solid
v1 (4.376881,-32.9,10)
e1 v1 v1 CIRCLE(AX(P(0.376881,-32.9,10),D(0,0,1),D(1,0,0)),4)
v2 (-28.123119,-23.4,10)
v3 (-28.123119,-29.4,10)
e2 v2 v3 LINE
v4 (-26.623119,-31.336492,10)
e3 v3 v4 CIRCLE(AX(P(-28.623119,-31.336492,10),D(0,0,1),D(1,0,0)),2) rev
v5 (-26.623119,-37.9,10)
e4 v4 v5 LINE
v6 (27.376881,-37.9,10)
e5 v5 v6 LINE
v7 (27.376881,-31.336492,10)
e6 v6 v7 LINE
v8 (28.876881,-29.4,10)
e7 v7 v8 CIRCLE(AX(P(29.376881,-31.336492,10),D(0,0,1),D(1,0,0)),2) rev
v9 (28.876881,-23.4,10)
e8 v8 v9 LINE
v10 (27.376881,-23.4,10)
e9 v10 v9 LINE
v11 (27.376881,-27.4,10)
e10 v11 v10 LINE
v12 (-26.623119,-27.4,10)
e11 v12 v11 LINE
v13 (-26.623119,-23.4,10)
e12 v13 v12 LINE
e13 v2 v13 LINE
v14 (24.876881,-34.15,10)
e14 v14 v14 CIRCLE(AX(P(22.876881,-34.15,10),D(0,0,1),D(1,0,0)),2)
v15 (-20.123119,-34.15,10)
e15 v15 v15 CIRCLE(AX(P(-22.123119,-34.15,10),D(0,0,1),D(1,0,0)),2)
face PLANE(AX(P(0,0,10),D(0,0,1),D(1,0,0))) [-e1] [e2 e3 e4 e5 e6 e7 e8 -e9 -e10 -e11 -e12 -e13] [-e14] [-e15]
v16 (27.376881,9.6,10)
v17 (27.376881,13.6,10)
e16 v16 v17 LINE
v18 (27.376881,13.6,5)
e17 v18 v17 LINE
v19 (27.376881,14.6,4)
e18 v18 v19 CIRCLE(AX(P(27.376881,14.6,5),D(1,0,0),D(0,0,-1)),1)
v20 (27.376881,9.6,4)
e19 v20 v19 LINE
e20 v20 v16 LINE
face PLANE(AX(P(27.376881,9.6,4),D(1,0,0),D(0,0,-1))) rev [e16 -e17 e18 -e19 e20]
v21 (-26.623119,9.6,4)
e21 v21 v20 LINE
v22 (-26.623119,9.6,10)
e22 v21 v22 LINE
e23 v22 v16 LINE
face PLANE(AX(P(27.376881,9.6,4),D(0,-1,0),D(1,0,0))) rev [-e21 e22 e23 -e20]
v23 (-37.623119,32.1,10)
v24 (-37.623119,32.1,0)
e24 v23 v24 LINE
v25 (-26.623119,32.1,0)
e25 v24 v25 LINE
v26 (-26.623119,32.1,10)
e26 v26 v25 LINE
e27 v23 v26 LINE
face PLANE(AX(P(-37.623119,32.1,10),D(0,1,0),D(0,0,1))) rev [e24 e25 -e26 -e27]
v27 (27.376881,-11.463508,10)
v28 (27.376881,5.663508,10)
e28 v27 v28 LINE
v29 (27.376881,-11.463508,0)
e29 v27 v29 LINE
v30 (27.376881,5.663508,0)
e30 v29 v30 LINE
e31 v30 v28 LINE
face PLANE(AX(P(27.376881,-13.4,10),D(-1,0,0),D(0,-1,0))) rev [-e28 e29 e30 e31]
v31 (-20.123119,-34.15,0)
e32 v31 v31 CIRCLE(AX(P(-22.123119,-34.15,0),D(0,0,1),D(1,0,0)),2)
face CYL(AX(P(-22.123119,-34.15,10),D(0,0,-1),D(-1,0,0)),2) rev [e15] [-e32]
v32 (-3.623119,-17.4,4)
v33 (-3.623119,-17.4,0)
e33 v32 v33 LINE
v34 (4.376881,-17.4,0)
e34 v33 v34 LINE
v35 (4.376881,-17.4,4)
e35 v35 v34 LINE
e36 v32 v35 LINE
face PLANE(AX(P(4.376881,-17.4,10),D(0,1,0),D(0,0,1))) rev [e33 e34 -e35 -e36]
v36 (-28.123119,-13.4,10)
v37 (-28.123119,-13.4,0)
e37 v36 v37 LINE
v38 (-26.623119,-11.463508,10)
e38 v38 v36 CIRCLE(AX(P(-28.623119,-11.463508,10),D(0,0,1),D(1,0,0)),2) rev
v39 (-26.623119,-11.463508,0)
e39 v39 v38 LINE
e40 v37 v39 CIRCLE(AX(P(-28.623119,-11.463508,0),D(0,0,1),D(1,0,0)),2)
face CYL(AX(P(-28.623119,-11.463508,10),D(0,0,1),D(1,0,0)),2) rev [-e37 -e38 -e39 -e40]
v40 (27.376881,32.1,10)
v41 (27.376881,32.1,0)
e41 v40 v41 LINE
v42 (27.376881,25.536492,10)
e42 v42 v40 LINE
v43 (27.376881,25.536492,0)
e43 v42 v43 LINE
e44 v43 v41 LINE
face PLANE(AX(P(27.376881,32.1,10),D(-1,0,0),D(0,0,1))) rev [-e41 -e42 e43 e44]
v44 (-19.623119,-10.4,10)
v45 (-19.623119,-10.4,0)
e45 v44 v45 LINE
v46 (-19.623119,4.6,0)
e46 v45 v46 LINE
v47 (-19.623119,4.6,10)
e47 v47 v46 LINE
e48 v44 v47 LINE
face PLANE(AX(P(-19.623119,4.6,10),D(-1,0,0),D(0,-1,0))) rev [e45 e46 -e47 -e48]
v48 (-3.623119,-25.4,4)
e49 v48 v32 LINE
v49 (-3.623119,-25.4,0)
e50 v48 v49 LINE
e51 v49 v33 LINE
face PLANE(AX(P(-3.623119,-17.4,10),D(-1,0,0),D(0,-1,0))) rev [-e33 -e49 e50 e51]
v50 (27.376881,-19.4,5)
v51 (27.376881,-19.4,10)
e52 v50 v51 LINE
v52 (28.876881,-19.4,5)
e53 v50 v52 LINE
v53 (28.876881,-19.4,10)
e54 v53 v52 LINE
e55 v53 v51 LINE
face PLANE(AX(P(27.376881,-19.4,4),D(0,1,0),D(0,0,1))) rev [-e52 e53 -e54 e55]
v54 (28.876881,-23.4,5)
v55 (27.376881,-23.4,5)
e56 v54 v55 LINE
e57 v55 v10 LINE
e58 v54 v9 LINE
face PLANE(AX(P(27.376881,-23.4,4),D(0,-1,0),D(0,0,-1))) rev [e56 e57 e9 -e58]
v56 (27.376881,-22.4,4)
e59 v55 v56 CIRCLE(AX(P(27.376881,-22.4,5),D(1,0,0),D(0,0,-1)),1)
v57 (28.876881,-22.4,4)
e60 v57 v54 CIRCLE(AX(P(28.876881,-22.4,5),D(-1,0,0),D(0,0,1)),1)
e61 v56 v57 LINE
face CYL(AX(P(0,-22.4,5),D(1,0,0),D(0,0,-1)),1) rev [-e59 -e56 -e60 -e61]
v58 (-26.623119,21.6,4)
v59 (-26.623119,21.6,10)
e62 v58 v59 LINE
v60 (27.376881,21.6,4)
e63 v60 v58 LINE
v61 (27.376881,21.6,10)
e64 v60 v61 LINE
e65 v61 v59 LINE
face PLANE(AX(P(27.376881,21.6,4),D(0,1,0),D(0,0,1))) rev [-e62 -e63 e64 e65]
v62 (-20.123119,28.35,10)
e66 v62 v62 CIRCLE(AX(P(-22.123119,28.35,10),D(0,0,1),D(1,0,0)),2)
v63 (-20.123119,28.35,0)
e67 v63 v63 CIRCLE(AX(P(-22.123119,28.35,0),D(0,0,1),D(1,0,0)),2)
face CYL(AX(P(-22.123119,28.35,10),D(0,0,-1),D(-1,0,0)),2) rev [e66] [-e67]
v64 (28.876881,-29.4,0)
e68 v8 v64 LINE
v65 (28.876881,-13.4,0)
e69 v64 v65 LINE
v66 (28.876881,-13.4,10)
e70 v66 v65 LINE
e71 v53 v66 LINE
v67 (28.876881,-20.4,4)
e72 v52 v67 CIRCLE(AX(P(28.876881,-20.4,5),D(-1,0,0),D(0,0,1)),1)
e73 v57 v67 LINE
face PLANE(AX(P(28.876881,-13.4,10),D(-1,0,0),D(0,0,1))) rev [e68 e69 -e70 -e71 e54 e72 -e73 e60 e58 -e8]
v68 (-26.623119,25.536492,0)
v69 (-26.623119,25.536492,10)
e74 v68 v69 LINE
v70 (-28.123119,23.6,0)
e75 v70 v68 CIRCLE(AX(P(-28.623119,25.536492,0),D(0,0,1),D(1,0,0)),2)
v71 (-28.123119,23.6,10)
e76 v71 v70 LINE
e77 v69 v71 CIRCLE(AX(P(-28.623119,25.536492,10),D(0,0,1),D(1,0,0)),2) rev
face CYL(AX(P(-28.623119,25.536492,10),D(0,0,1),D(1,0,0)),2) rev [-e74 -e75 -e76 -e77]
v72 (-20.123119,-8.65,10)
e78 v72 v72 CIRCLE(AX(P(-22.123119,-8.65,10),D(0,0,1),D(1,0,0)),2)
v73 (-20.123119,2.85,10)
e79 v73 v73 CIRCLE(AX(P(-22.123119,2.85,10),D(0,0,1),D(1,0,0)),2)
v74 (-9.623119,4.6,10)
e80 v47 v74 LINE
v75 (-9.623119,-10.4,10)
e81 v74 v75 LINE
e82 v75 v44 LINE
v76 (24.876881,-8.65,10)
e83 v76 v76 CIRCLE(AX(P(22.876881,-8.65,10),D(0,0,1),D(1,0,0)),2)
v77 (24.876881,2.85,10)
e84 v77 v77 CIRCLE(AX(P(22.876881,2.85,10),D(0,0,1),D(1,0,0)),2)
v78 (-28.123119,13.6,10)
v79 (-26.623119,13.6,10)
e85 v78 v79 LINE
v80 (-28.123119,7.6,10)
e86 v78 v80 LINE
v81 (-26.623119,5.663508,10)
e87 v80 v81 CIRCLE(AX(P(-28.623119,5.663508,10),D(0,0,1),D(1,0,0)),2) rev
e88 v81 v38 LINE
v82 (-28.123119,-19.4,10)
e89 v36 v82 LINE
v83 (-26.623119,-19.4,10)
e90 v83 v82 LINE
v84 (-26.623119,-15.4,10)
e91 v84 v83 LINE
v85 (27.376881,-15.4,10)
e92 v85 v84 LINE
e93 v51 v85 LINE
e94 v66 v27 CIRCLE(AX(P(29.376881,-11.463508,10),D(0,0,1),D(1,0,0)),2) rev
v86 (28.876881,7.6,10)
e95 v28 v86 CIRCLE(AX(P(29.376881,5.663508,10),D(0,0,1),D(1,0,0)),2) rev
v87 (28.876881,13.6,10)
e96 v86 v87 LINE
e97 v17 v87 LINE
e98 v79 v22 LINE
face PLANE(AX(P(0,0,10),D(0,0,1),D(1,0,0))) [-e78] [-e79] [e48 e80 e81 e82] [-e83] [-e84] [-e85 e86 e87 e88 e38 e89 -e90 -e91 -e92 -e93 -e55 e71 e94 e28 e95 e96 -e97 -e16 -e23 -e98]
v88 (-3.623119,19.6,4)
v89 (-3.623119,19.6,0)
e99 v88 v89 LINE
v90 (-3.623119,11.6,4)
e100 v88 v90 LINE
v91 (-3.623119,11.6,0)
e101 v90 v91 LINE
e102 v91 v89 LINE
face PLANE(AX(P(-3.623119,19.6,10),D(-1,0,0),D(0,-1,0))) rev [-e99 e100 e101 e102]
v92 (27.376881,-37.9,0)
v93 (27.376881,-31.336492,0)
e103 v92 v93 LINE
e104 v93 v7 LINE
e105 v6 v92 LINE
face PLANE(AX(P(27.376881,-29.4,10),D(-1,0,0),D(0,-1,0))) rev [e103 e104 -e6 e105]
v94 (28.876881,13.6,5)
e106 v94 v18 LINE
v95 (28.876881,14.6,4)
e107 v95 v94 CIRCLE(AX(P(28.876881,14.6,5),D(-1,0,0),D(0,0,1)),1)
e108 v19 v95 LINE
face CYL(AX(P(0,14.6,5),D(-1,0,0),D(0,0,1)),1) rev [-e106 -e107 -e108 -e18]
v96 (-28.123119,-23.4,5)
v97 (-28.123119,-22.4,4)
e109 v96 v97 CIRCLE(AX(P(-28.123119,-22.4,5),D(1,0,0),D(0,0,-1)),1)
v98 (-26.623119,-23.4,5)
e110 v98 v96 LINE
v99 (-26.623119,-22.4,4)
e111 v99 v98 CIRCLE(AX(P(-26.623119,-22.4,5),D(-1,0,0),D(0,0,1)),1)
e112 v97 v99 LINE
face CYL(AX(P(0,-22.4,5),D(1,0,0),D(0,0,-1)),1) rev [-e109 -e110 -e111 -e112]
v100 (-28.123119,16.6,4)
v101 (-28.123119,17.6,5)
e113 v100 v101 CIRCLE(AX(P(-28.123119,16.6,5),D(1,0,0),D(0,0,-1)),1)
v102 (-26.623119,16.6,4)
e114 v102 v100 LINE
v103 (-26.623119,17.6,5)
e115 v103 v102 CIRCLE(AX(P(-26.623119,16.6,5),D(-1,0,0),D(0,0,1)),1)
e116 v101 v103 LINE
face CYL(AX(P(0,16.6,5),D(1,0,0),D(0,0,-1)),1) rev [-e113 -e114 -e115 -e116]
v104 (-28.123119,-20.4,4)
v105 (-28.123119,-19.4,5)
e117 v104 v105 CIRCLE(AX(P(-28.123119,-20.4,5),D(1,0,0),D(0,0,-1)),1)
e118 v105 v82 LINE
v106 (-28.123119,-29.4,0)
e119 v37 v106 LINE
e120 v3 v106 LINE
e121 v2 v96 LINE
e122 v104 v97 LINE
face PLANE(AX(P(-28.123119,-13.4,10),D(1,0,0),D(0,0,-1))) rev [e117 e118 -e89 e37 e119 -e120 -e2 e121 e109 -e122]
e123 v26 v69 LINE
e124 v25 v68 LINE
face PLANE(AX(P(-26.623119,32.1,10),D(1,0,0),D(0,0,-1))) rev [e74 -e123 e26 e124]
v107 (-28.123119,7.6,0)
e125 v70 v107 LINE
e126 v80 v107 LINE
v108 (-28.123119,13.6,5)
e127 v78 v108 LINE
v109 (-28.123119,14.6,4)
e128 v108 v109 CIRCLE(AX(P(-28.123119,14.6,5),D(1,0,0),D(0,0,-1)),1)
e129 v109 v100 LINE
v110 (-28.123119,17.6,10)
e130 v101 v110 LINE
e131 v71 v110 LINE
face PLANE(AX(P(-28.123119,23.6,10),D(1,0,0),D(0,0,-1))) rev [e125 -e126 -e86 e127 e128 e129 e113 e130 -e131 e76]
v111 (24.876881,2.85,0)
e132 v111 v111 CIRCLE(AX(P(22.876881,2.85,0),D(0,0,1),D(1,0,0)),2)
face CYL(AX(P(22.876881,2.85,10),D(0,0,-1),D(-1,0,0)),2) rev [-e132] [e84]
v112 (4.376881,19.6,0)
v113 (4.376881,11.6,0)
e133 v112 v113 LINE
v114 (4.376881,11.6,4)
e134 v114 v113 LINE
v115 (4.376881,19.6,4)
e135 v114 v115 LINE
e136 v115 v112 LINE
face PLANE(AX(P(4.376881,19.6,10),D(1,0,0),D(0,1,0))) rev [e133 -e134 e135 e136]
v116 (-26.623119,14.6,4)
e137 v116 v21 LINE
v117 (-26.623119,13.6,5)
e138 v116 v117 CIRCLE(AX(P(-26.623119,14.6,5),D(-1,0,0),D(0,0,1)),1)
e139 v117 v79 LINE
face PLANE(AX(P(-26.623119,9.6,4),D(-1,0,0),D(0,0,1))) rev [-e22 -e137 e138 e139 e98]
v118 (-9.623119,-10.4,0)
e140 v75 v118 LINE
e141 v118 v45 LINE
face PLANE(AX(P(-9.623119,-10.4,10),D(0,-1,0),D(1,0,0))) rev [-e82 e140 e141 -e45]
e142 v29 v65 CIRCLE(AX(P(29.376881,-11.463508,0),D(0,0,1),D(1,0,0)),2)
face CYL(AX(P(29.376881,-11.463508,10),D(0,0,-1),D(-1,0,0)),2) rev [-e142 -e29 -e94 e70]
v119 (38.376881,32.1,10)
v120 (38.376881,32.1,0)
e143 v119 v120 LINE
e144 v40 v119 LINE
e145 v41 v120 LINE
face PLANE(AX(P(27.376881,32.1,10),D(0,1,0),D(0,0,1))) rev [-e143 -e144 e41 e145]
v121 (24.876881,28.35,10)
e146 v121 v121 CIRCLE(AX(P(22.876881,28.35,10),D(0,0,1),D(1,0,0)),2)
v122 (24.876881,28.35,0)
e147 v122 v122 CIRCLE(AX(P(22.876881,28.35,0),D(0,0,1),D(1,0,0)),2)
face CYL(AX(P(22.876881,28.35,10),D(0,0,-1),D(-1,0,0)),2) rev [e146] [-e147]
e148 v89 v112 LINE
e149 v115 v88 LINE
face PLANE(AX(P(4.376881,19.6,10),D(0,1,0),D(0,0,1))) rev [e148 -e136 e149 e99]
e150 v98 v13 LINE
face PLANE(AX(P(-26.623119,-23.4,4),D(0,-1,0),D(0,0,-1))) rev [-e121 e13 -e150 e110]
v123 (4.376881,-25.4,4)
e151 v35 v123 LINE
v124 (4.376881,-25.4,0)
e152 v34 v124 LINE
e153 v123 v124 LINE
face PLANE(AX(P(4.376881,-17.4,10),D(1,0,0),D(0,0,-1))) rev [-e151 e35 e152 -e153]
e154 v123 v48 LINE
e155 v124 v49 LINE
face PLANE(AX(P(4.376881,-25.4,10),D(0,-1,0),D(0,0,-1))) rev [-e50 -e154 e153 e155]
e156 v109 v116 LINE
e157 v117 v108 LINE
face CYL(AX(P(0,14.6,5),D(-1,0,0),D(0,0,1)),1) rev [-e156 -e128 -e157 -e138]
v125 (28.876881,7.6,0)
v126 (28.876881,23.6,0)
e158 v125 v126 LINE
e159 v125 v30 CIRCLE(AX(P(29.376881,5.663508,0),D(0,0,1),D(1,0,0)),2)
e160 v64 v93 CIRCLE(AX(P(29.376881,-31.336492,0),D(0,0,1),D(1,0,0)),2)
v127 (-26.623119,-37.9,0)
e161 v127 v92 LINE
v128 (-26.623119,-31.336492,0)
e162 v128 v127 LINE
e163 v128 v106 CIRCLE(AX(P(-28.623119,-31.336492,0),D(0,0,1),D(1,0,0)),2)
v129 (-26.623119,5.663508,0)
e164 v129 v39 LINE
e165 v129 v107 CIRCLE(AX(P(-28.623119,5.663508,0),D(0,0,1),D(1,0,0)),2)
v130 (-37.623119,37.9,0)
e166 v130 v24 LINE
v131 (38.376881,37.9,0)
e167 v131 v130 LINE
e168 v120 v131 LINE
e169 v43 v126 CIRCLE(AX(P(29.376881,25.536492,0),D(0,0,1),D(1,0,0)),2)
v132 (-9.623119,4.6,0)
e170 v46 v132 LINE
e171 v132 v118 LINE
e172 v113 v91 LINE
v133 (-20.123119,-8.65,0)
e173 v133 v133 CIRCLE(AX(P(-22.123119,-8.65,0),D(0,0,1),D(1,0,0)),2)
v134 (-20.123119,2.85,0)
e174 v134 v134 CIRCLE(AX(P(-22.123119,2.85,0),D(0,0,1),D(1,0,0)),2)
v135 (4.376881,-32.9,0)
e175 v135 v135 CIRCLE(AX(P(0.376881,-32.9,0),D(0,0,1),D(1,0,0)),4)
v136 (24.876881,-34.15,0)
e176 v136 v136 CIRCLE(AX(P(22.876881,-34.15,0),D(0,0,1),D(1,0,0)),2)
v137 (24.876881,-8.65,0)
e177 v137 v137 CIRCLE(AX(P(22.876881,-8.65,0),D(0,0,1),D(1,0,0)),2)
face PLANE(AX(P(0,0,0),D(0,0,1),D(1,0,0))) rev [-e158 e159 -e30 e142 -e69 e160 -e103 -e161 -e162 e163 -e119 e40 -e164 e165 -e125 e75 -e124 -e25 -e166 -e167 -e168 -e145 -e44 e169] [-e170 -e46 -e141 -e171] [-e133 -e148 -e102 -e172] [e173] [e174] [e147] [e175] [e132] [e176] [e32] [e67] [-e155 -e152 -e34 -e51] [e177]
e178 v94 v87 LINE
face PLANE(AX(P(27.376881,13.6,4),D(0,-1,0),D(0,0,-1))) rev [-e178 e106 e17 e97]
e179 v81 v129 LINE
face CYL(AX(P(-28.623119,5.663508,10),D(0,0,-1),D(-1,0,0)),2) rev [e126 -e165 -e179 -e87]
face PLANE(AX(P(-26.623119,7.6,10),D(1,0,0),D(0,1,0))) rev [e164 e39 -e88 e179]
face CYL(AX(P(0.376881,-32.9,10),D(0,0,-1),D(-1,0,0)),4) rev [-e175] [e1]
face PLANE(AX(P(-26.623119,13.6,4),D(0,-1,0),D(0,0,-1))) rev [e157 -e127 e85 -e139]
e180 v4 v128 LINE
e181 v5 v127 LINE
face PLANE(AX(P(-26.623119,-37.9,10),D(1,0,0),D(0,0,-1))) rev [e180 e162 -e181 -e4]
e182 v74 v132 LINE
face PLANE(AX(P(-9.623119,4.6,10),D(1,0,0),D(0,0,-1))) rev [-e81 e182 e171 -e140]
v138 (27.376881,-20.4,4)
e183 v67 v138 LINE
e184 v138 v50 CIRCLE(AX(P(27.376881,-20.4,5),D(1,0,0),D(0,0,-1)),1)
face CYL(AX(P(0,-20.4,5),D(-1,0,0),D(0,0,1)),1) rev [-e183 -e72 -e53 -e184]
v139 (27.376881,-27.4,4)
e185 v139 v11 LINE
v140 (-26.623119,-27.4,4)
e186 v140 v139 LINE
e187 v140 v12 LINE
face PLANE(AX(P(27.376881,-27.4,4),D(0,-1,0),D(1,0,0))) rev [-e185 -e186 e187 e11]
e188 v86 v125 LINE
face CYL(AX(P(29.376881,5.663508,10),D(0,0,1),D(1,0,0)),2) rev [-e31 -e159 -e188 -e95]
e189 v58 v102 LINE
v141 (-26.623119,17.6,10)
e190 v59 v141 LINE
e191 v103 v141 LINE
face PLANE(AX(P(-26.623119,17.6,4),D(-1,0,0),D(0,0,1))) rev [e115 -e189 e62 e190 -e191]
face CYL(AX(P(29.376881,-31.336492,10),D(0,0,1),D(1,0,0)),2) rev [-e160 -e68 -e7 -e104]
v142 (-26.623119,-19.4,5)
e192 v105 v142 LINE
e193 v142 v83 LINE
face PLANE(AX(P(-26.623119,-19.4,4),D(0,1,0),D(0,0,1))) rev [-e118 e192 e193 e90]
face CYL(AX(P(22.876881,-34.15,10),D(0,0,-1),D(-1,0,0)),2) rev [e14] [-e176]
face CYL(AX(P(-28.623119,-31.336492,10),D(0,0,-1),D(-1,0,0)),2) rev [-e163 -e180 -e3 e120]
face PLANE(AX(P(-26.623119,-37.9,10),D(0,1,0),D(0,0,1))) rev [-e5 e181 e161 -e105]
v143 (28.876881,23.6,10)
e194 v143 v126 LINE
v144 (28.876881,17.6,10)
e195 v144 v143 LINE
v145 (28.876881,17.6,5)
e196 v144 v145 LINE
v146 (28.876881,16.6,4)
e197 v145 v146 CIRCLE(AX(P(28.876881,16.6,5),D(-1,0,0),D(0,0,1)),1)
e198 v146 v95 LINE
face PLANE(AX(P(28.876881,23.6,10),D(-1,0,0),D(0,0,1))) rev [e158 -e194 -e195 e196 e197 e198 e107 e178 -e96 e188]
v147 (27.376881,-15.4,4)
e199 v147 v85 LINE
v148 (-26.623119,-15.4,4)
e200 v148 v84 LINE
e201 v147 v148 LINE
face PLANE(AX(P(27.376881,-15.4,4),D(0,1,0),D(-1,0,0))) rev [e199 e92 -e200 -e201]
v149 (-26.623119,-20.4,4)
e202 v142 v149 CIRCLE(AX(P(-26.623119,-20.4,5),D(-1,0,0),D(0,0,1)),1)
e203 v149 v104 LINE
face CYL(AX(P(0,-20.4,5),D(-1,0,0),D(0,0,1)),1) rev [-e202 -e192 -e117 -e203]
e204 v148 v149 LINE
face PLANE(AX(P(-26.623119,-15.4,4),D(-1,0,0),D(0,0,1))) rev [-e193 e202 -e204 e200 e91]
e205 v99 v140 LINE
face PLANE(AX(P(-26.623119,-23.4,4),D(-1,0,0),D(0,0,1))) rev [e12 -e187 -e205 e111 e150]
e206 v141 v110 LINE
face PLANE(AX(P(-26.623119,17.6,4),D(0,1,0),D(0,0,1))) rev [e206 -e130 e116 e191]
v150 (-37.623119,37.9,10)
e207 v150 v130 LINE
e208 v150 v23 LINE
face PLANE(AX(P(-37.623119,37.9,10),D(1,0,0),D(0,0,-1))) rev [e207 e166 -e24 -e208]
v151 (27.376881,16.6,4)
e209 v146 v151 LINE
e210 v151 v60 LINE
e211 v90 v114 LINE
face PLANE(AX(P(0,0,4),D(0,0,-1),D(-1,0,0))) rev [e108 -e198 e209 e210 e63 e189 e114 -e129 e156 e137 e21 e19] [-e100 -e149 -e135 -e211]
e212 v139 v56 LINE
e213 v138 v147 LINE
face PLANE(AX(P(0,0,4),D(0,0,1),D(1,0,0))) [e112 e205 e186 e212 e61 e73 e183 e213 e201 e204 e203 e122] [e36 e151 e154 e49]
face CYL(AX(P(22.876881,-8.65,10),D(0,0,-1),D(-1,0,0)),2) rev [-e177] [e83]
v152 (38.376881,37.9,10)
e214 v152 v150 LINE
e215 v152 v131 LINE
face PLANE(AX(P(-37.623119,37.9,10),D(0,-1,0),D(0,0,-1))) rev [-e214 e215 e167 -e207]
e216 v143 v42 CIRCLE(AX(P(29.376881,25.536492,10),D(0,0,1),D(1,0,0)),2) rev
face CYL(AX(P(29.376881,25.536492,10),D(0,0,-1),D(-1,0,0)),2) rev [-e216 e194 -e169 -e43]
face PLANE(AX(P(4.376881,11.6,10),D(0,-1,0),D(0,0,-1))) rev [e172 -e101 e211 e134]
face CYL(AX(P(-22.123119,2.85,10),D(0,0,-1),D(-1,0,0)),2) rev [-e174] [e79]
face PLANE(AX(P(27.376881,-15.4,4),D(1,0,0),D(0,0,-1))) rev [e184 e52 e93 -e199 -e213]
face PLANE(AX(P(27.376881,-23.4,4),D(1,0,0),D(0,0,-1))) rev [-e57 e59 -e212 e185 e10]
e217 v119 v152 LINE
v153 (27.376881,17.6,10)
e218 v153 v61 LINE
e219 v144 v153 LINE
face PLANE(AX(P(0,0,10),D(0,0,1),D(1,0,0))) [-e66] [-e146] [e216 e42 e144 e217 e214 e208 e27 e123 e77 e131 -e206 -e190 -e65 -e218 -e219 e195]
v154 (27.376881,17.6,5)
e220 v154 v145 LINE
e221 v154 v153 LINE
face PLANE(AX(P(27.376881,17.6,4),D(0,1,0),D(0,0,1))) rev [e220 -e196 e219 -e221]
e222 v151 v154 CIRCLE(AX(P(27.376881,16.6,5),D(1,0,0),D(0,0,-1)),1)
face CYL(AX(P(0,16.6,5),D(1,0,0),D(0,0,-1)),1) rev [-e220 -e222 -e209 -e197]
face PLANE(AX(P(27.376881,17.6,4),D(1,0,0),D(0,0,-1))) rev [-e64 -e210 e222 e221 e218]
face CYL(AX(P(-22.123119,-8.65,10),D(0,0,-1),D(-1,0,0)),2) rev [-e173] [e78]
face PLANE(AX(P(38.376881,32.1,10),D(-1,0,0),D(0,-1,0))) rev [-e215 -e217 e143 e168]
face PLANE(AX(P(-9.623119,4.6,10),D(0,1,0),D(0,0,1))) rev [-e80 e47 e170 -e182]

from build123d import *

# Parameters (mm, degrees)
ESBO_O1_R                = 2
ESBO_O1_R_2              = 4
RESSALTO_EXTRUS_O1_DEPTH = 10
ESBO_O7_W                = 10
ESBO_O7_H                = 15
ESBO_O7_W_2              = 8
ESBO_O7_H_2              = 8
CORTE_EXTRUS_O1_DEPTH    = 55.856129841
CORTE_EXTRUS_O7_DEPTH    = 6
FILETE1_R                = 1
FILETE2_R                = 2


with BuildPart() as part:
    # Esboço1 → Ressalto-extrusão1 (new body)
    with BuildSketch(Plane.XY):
        Polygon((-26.623119185, 32.1), (-26.623119185, 23.6), (-28.123119185, 23.6), (-28.123119185, 7.6), (-26.623119185, 7.6), (-26.623119185, -13.4), (-28.123119185, -13.4), (-28.123119185, -29.4), (-26.623119185, -29.4), (-26.623119185, -37.9), (27.376880815, -37.9), (27.376880815, -29.4), (28.876880815, -29.4), (28.876880815, -13.4), (27.376880815, -13.4), (27.376880815, 7.6), (28.876880815, 7.6), (28.876880815, 23.6), (27.376880815, 23.6), (27.376880815, 32.1), (38.376880815, 32.1), (38.376880815, 37.9), (-37.623119185, 37.9), (-37.623119185, 32.1), align=None)
        with Locations((-22.123119185, 28.35)):
            Circle(ESBO_O1_R, mode=Mode.SUBTRACT)
        with Locations((22.876880815, 28.35)):
            Circle(ESBO_O1_R, mode=Mode.SUBTRACT)
        with Locations((22.876880815, -34.15)):
            Circle(ESBO_O1_R, mode=Mode.SUBTRACT)
        with Locations((-22.123119185, -34.15)):
            Circle(ESBO_O1_R, mode=Mode.SUBTRACT)
        with Locations((-22.123119185, -8.65)):
            Circle(ESBO_O1_R, mode=Mode.SUBTRACT)
        with Locations((22.876880815, -8.65)):
            Circle(ESBO_O1_R, mode=Mode.SUBTRACT)
        with Locations((-22.123119185, 2.85)):
            Circle(ESBO_O1_R, mode=Mode.SUBTRACT)
        with Locations((22.876880815, 2.85)):
            Circle(ESBO_O1_R, mode=Mode.SUBTRACT)
        with Locations((0.376880815, -32.9)):
            Circle(ESBO_O1_R_2, mode=Mode.SUBTRACT)
    extrude(amount=RESSALTO_EXTRUS_O1_DEPTH)

    # Esboço7 → Corte-extrusão1 (cut, through all)
    with BuildSketch(Plane(origin=(0, 0, 0), x_dir=(-1, 0, 0), z_dir=(0, 0, -1))):
        with Locations((14.623119185, -2.9)):
            Rectangle(ESBO_O7_W, ESBO_O7_H)
        with Locations((-0.376880815, 15.6)):
            Rectangle(ESBO_O7_W_2, ESBO_O7_H_2)
        with Locations((-0.376880815, -21.4)):
            Rectangle(ESBO_O7_W_2, ESBO_O7_H_2)
    extrude(amount=-CORTE_EXTRUS_O1_DEPTH, mode=Mode.SUBTRACT)

    # Esboço9 → Corte-extrusão7 (cut)
    with BuildSketch(Plane.XY.offset(10)):
        Polygon((27.376880815, 9.6), (-26.623119185, 9.6), (-26.623119185, 13.6), (-28.623119185, 13.6), (-28.623119185, 17.6), (-26.623119185, 17.6), (-26.623119185, 21.6), (27.376880815, 21.6), (27.376880815, 17.6), (29.376880815, 17.6), (29.376880815, 13.6), (27.376880815, 13.6), align=None)
        Polygon((27.376880815, -15.4), (-26.623119185, -15.4), (-26.623119185, -19.4), (-28.623119185, -19.4), (-28.623119185, -23.4), (-26.623119185, -23.4), (-26.623119185, -27.4), (27.376880815, -27.4), (27.376880815, -23.4), (29.376880815, -23.4), (29.376880815, -19.4), (27.376880815, -19.4), align=None)
    extrude(amount=-CORTE_EXTRUS_O7_DEPTH, mode=Mode.SUBTRACT)

    # Filete1
    filete1_edges = [part.edges().sort_by_distance(p)[0] for p in [
        (28.126880815, 17.6, 4),
        (28.126880815, 13.6, 4),
        (-27.373119185, 13.6, 4),
        (-27.373119185, 17.6, 4),
        (28.126880815, -19.4, 4),
        (28.126880815, -23.4, 4),
        (-27.373119185, -23.4, 4),
        (-27.373119185, -19.4, 4),
    ]]
    fillet(filete1_edges, radius=FILETE1_R)

    # Filete2
    # the kernel refuses this fillet: 2 mm, written as the material it adds along each edge
    with BuildSketch(Plane(origin=(-26.623119185, 23.6, 0), x_dir=(0, 1, 0), z_dir=(0, 0, 1)), Plane(origin=(27.376880815, -29.4, 0), x_dir=(0, -1, 0), z_dir=(0, 0, 1))) as filete2_piece_1:
        with BuildLine():
            CenterArc((1.936491673, 2), FILETE2_R, 194.477512186, 75.522487814)
            Line((0, 1.5), (-0.038729833, 1.49))
            ThreePointArc((-0.038729833, 1.49), (-0.04, 0.75), (-0.04, 0))
            Line((-0.04, 0), (0, -0.04))
            Line((0, -0.04), (1.936491673, -0.04))
            Line((1.936491673, -0.04), (1.936491673, 0))
        make_face()
    extrude(amount=10)
    with BuildSketch(Plane(origin=(27.376880815, 23.6, 0), x_dir=(1, 0, 0), z_dir=(0, 0, 1)), Plane(origin=(-26.623119185, -29.4, 0), x_dir=(-1, 0, 0), z_dir=(0, 0, 1))) as filete2_piece_2:
        with BuildLine():
            CenterArc((2, 1.936491673), FILETE2_R, 180, 75.522487814)
            Line((0, 1.936491673), (-0.04, 1.936491673))
            Line((-0.04, 1.936491673), (-0.04, 0))
            Line((-0.04, 0), (0, -0.04))
            ThreePointArc((0, -0.04), (0.75, -0.04), (1.49, -0.038729833))
            Line((1.49, -0.038729833), (1.5, 0))
        make_face()
    extrude(amount=10)
    with BuildSketch(Plane(origin=(27.376880815, 7.6, 0), x_dir=(1, 0, 0), z_dir=(0, 0, 1)), Plane(origin=(-26.623119185, -13.4, 0), x_dir=(-1, 0, 0), z_dir=(0, 0, 1))) as filete2_piece_3:
        with BuildLine():
            CenterArc((2, -1.936491673), FILETE2_R, 104.477512186, 75.522487814)
            Line((0, -1.936491673), (-0.04, -1.936491673))
            Line((-0.04, -1.936491673), (-0.04, 0))
            Line((-0.04, 0), (0, 0.04))
            ThreePointArc((0, 0.04), (0.75, 0.04), (1.49, 0.038729833))
            Line((1.49, 0.038729833), (1.5, 0))
        make_face()
    extrude(amount=10)
    with BuildSketch(Plane(origin=(27.376880815, -13.4, 0), x_dir=(0, 1, 0), z_dir=(0, 0, 1)), Plane(origin=(-26.623119185, 7.6, 0), x_dir=(0, -1, 0), z_dir=(0, 0, 1))) as filete2_piece_4:
        with BuildLine():
            CenterArc((1.936491673, -2), FILETE2_R, 90, 75.522487814)
            Line((0, -1.5), (-0.038729833, -1.49))
            ThreePointArc((-0.038729833, -1.49), (-0.04, -0.75), (-0.04, 0))
            Line((-0.04, 0), (0, 0.04))
            Line((0, 0.04), (1.936491673, 0.04))
            Line((1.936491673, 0.04), (1.936491673, 0))
        make_face()
    extrude(amount=10)


solid = part.part
